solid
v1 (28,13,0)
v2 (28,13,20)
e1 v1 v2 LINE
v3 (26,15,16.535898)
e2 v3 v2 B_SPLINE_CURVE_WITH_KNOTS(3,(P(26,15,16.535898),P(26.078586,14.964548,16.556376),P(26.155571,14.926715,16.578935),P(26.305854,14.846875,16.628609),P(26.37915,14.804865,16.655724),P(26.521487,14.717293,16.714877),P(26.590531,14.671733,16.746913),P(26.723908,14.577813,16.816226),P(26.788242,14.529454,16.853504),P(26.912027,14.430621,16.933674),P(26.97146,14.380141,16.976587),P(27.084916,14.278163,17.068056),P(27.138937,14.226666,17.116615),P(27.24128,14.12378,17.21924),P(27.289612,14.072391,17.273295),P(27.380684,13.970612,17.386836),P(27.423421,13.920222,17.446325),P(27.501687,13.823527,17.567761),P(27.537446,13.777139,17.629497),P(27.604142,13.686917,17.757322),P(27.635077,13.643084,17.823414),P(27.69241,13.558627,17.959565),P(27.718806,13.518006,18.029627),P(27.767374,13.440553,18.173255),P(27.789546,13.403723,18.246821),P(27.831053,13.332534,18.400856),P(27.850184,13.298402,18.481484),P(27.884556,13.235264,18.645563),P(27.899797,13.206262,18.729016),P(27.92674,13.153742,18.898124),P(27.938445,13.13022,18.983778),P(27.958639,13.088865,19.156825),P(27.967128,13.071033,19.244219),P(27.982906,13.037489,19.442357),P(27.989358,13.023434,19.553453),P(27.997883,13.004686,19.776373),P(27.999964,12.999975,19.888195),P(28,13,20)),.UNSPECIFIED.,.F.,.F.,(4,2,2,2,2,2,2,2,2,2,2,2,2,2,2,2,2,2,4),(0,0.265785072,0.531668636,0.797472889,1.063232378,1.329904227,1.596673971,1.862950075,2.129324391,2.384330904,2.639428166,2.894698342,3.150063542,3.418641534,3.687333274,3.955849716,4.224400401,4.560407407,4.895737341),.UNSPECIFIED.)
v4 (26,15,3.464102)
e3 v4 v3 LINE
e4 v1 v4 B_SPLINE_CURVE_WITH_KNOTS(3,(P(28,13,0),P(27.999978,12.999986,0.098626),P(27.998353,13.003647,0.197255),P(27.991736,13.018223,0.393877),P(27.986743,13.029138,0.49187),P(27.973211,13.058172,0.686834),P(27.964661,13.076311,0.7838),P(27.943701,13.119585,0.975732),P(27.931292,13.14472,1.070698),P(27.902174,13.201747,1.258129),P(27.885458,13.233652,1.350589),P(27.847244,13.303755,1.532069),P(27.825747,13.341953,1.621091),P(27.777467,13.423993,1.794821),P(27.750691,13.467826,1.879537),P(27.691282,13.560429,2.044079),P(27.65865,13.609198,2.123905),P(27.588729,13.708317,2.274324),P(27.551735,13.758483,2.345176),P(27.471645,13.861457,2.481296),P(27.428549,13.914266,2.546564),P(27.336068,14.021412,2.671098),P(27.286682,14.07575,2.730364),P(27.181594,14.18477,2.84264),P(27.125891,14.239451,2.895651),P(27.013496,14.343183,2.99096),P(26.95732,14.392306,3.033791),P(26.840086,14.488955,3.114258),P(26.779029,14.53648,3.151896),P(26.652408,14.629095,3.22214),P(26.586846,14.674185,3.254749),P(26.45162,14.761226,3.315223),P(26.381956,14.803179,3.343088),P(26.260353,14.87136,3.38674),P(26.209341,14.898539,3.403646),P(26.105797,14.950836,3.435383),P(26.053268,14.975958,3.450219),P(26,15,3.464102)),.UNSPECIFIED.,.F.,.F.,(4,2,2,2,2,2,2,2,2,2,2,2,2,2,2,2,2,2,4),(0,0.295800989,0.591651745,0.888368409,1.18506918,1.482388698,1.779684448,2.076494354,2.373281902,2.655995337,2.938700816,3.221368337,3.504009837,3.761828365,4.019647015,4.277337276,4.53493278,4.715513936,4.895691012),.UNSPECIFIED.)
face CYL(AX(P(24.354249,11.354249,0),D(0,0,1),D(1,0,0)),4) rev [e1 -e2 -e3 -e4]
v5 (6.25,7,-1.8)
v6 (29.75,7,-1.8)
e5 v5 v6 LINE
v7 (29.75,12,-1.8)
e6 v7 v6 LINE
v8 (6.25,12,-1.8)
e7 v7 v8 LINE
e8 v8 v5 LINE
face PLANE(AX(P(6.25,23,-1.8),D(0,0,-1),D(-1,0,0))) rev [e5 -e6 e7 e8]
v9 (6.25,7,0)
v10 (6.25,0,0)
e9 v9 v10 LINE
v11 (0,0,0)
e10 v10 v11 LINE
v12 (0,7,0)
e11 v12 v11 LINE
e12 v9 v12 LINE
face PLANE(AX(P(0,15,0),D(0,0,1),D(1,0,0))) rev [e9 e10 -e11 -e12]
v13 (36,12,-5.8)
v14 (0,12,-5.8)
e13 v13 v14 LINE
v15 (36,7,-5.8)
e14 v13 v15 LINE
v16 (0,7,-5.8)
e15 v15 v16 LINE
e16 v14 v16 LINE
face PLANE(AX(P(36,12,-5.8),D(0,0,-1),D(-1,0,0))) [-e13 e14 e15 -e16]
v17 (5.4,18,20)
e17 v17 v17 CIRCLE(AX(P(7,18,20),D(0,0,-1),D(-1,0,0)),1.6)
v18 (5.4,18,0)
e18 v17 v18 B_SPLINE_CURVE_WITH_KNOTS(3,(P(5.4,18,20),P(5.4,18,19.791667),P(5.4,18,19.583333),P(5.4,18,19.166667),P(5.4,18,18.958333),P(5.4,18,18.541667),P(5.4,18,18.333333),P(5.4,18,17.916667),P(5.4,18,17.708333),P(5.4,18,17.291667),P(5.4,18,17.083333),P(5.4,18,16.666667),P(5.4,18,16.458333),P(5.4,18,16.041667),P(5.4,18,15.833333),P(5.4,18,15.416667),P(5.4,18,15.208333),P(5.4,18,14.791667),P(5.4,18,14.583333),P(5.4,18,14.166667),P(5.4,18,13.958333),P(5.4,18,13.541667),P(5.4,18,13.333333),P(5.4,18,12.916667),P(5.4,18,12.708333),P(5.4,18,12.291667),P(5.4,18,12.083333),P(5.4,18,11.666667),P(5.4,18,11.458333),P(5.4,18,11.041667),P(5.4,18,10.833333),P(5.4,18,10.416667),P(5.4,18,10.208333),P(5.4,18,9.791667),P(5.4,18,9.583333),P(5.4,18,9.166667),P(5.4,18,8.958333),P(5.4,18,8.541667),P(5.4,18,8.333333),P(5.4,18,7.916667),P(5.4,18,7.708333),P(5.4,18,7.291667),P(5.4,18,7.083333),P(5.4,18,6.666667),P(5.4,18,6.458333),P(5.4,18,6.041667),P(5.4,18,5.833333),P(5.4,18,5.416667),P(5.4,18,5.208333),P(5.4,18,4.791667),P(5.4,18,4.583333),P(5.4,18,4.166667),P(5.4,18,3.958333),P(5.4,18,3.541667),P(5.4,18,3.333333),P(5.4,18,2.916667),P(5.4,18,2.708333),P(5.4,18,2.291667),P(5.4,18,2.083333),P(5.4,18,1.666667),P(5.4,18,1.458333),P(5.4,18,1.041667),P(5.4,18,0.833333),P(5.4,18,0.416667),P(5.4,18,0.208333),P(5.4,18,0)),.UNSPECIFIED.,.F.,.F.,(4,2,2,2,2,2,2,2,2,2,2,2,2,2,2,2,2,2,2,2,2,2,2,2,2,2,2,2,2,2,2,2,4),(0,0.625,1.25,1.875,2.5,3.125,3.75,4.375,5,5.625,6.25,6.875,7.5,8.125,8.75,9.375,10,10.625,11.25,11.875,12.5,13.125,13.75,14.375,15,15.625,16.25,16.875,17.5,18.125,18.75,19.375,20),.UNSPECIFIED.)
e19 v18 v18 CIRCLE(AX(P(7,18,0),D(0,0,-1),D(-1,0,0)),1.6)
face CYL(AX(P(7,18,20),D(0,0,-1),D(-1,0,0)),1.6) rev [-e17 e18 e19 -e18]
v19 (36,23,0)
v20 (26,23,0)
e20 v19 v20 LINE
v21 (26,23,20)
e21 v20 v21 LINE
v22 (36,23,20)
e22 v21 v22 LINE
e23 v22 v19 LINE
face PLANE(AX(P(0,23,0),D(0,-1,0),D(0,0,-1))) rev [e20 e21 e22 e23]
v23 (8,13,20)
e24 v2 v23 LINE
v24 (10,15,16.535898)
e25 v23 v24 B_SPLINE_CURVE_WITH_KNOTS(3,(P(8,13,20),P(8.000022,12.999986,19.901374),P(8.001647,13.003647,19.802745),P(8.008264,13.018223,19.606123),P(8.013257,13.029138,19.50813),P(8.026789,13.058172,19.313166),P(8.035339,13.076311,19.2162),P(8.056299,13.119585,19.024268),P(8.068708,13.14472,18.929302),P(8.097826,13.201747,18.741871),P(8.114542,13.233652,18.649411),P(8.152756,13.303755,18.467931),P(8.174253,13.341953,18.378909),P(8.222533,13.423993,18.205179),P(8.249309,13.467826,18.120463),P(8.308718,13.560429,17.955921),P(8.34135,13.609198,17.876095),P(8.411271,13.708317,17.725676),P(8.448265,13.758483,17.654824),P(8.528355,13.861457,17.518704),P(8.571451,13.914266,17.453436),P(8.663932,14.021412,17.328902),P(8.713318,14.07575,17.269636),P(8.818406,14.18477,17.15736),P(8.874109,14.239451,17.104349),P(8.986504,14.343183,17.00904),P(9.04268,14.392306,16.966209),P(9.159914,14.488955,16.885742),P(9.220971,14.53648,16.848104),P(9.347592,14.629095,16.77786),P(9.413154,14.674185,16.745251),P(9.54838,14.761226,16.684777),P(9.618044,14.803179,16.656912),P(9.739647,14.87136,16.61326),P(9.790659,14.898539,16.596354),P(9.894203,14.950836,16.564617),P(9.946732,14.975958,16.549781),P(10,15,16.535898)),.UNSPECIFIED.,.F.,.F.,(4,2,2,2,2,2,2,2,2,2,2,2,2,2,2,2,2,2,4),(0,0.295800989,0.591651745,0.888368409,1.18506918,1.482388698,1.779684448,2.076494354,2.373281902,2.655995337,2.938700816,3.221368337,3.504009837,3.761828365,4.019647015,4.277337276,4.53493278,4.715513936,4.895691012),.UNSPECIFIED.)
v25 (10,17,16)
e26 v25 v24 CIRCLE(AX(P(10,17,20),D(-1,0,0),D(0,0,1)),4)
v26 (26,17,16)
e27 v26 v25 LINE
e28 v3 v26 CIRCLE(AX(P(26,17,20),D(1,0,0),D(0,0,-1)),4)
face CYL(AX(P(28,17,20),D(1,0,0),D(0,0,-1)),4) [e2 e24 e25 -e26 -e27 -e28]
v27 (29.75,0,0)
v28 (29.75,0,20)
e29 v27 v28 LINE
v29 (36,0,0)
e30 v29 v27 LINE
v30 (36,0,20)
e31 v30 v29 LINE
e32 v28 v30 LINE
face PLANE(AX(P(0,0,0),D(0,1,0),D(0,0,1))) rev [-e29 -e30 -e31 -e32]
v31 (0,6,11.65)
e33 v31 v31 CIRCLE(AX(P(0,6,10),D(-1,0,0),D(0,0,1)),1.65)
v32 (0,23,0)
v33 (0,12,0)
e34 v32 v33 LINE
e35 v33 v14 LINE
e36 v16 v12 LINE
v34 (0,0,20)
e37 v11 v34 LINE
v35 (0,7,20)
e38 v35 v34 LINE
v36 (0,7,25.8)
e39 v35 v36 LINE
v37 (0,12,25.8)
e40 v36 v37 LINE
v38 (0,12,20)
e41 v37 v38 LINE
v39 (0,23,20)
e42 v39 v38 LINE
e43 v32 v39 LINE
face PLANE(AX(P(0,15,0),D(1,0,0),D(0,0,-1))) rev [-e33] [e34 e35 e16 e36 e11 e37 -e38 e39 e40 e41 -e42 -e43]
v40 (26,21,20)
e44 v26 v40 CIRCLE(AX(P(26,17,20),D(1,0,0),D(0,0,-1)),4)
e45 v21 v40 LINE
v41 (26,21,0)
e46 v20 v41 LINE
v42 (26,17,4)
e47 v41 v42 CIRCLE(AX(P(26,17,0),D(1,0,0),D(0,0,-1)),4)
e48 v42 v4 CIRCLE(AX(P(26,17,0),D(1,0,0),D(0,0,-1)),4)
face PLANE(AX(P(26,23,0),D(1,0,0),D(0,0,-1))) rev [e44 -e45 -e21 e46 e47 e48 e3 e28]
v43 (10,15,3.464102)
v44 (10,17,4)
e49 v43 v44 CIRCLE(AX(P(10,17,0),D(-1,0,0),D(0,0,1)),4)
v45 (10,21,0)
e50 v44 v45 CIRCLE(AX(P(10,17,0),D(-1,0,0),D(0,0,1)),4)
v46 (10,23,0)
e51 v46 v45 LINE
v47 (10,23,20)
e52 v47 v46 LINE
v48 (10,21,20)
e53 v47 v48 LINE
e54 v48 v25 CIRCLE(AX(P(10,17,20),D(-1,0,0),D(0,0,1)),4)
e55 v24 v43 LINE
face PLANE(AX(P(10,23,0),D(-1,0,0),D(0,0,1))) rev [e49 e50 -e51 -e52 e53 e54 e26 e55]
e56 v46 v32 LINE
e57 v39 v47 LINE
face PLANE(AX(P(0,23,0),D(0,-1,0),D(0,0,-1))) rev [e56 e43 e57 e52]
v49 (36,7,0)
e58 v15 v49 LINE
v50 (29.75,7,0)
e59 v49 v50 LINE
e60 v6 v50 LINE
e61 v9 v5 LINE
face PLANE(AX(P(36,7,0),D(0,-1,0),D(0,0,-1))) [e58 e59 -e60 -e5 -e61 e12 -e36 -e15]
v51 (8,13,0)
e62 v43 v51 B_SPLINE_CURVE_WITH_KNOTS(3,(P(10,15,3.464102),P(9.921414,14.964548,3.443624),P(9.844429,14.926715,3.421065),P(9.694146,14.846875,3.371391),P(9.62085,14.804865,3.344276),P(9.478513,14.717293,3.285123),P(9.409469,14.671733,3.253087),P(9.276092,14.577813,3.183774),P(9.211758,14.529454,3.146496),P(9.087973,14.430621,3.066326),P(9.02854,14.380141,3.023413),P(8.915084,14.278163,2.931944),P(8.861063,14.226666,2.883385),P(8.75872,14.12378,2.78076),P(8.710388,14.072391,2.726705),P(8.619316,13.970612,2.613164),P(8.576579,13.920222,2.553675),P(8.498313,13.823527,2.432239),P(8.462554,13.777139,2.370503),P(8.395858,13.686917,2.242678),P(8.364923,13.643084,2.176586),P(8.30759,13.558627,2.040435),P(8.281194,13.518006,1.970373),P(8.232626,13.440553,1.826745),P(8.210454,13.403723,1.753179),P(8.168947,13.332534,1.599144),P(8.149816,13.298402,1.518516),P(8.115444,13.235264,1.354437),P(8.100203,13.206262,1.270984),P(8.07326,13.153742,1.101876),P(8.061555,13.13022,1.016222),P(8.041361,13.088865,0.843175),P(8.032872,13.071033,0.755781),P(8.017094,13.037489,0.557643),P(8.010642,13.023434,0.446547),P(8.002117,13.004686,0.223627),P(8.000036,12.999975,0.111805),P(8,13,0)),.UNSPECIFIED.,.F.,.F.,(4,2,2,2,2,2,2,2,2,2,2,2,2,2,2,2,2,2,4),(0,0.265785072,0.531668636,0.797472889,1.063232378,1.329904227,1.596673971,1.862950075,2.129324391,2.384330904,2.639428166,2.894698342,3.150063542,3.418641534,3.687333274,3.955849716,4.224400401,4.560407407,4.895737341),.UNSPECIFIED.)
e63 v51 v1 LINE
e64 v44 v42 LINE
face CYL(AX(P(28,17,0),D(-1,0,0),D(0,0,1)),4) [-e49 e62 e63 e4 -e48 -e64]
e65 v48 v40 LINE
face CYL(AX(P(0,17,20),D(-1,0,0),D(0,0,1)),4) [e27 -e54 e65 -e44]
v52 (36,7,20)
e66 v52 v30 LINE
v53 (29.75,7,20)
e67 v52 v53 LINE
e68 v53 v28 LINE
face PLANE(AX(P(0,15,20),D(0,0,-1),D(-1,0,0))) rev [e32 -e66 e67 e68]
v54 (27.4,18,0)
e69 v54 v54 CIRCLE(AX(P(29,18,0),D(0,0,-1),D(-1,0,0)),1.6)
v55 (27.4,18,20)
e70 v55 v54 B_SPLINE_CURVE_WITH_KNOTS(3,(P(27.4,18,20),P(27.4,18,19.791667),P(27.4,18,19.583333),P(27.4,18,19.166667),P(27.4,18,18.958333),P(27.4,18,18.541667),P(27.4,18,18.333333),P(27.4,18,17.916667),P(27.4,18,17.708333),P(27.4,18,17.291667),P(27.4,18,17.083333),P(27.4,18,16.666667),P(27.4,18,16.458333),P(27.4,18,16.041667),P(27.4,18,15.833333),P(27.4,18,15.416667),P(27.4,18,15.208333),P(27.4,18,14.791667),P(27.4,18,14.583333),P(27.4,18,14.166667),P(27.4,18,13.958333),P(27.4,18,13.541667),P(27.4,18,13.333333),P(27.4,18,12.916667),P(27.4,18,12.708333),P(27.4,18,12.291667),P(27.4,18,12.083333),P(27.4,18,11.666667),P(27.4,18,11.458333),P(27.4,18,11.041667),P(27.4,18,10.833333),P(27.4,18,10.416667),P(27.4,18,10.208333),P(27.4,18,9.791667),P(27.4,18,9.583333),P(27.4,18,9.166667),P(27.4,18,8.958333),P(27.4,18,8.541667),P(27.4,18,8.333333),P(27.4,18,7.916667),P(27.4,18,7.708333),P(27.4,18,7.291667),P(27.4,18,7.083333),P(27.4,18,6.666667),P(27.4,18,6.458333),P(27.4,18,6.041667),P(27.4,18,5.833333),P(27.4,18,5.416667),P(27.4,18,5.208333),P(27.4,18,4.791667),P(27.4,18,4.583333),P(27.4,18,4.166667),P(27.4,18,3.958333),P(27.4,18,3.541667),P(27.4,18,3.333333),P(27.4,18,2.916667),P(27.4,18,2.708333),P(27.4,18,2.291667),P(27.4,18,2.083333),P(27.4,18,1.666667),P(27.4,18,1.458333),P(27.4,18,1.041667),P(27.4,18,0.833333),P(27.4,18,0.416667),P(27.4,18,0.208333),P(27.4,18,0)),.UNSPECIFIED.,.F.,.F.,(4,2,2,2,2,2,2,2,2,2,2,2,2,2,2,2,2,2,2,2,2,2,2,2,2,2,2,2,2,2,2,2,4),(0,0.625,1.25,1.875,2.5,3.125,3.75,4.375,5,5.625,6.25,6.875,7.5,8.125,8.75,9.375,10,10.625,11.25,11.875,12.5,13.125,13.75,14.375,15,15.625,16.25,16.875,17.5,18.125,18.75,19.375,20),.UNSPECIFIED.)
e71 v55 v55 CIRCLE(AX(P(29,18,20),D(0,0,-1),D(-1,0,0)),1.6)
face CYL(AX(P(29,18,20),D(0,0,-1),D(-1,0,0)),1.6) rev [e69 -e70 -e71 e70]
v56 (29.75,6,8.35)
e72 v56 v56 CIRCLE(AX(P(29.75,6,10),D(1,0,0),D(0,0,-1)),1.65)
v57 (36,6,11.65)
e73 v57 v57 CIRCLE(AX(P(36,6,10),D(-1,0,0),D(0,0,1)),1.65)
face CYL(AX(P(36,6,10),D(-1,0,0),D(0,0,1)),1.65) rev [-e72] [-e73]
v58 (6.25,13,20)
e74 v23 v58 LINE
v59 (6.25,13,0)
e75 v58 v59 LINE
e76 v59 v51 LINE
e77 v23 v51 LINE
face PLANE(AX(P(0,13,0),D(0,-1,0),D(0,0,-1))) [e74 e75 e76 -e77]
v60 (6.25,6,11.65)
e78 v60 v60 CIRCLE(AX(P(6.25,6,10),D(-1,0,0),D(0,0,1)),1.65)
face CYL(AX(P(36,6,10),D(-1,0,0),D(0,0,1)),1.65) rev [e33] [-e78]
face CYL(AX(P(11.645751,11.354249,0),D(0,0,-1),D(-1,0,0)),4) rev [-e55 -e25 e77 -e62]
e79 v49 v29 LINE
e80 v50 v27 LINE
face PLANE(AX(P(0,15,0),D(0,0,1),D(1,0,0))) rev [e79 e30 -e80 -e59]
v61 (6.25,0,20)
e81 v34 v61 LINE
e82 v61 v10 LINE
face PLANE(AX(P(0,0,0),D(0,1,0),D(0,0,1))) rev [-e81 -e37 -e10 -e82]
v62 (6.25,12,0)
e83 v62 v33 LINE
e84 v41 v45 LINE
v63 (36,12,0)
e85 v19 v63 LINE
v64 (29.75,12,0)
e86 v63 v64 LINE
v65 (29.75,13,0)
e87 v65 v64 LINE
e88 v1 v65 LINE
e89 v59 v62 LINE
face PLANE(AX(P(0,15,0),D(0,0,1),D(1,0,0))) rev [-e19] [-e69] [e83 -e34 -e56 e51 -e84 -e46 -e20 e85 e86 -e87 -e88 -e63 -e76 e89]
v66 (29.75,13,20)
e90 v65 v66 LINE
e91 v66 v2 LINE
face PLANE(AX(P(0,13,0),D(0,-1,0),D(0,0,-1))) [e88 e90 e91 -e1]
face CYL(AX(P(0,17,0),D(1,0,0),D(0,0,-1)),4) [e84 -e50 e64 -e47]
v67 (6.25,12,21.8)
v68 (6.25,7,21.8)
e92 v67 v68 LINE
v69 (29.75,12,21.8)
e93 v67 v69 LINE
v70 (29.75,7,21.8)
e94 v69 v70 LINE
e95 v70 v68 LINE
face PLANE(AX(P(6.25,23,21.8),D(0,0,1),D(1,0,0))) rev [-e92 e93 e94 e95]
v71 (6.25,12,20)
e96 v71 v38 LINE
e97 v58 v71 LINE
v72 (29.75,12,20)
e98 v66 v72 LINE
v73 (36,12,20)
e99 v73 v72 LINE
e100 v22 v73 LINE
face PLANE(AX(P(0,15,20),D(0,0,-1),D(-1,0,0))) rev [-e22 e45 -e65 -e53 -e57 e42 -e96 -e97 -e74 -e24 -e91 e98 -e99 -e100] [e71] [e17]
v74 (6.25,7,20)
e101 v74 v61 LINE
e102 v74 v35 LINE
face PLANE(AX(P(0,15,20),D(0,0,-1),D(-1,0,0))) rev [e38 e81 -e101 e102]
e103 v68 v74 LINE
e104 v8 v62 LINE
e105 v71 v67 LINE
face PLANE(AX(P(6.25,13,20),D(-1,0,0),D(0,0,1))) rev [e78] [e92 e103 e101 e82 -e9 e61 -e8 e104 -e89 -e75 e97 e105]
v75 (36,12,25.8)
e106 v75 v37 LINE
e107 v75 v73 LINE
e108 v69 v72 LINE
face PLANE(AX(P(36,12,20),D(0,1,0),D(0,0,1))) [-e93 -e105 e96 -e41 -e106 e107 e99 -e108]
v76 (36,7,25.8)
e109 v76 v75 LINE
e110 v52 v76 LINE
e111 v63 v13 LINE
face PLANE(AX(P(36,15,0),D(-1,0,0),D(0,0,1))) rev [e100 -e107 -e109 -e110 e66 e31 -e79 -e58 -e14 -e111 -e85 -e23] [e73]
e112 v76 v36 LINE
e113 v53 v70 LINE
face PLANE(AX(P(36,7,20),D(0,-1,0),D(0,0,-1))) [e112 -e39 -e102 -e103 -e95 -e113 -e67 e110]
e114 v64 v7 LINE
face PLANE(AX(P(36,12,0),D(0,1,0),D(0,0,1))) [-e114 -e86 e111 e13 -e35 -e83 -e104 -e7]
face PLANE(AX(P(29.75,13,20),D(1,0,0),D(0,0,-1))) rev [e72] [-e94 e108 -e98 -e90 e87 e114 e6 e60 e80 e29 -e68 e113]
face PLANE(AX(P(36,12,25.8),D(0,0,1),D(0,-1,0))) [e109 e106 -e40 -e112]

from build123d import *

# Parameters (mm, degrees)
SKETCH1_W           = 36
SKETCH1_H           = 20
BOSS_EXTRUDE1_DEPTH = 15
SKETCH2_W           = 23.5
SKETCH2_H           = 20
CUT_EXTRUDE1_DEPTH  = 13
SKETCH3_R           = 1.65
CUT_EXTRUDE2_DEPTH  = 44.829214002
SKETCH4_W           = 20
SKETCH4_H           = 12
CUT_EXTRUDE3_DEPTH  = 44.829214002
SKETCH5_W           = 10
SKETCH5_H           = 20
BOSS_EXTRUDE2_DEPTH = 8
SKETCH6_R           = 1.6
CUT_EXTRUDE4_DEPTH  = 48.16990566
SKETCH7_W           = 16
SKETCH7_H           = 4
BOSS_EXTRUDE3_DEPTH = 6
FILLET1_R           = 4
FILLET2_R           = 4
FILLET5_R           = 4
SKETCH8_W           = 5.8
SKETCH8_H           = 5
BOSS_EXTRUDE4_DEPTH = 36
SKETCH9_W           = 23.5
SKETCH9_H           = 1.8
CUT_EXTRUDE5_DEPTH  = 48.091825193


# Some blends are built 0.0001 mm under size
with BuildPart() as part:
    # Sketch1 → Boss-Extrude1 (new body)
    with BuildSketch(Plane(origin=(0, 0, 0), x_dir=(1, 0, 0), z_dir=(0, 1, 0))):
        with Locations((18, -10)):
            Rectangle(SKETCH1_W, SKETCH1_H)
    extrude(amount=BOSS_EXTRUDE1_DEPTH)

    # Sketch2 → Cut-Extrude1 (cut)
    with BuildSketch(Plane(origin=(0, 0, 0), x_dir=(-1, 0, 0), z_dir=(0, -1, 0))):
        with Locations((-18, -10)):
            Rectangle(SKETCH2_W, SKETCH2_H)
    extrude(amount=-CUT_EXTRUDE1_DEPTH, mode=Mode.SUBTRACT)

    # Sketch3 → Cut-Extrude2 (cut, through all)
    with BuildSketch(Plane.ZY):
        with Locations((10, 6)):
            Circle(SKETCH3_R)
    extrude(amount=-CUT_EXTRUDE2_DEPTH, mode=Mode.SUBTRACT)

    # Sketch4 → Cut-Extrude3 (cut, through all)
    with BuildSketch(Plane(origin=(0, 15, 0), x_dir=(1, 0, 0), z_dir=(0, 1, 0))):
        with Locations((18, -10)):
            Rectangle(SKETCH4_W, SKETCH4_H)
    extrude(amount=-CUT_EXTRUDE3_DEPTH, mode=Mode.SUBTRACT)

    # Sketch5 → Boss-Extrude2 (add)
    with BuildSketch(Plane(origin=(0, 15, 0), x_dir=(1, 0, 0), z_dir=(0, 1, 0))):
        with Locations((31, -10)):
            Rectangle(SKETCH5_W, SKETCH5_H)
        with Locations((5, -10)):
            Rectangle(SKETCH5_W, SKETCH5_H)
    extrude(amount=BOSS_EXTRUDE2_DEPTH)

    # Sketch6 → Cut-Extrude4 (cut, through all)
    with BuildSketch(Plane(origin=(0, 0, 0), x_dir=(-1, 0, 0), z_dir=(0, 0, -1))):
        with Locations((-29, 18)):
            Circle(SKETCH6_R)
        with Locations((-7, 18)):
            Circle(SKETCH6_R)
    extrude(amount=-CUT_EXTRUDE4_DEPTH, mode=Mode.SUBTRACT)

    # Sketch7 → Boss-Extrude3 (add)
    with BuildSketch(Plane(origin=(0, 15, 0), x_dir=(1, 0, 0), z_dir=(0, 1, 0))):
        with Locations((18, -18)):
            Rectangle(SKETCH7_W, SKETCH7_H)
        with Locations((18, -2)):
            Rectangle(SKETCH7_W, SKETCH7_H)
    extrude(amount=BOSS_EXTRUDE3_DEPTH)

    # Fillet1
    # the kernel refuses this fillet: 4 mm, written as the material it takes off along each edge
    with BuildSketch(Plane(origin=(8, 13, 16), x_dir=(0, 0, 1), z_dir=(1, 0, 0))) as fillet1_piece_1_section:
        with BuildLine():
            CenterArc((FILLET1_R, -FILLET1_R), FILLET1_R, 90, 90)
            Line((0, -FILLET1_R), (0, 0))
            Line((0, 0), (FILLET1_R, 0))
        make_face()
    fillet1_piece_1 = extrude(amount=20, mode=Mode.PRIVATE)
    fillet1_piece_1 = split(fillet1_piece_1, bisect_by=Plane(origin=(10, 13, 16), z_dir=(-1, 0, 0)), keep=Keep.TOP, mode=Mode.PRIVATE)
    fillet1_piece_1 = split(fillet1_piece_1, bisect_by=Plane(origin=(8, 15, 16), z_dir=(0, -1, 0)), keep=Keep.TOP, mode=Mode.PRIVATE)
    add(fillet1_piece_1, mode=Mode.SUBTRACT)
    with BuildSketch(Plane(origin=(8, 13, 16), x_dir=(0, 0, 1), z_dir=(1, 0, 0))) as fillet1_piece_2_section:
        with BuildLine():
            CenterArc((FILLET1_R, -FILLET1_R), FILLET1_R, 90, 90)
            Line((0, -FILLET1_R), (0, 0))
            Line((0, 0), (FILLET1_R, 0))
        make_face()
    fillet1_piece_2 = extrude(amount=20, mode=Mode.PRIVATE)
    fillet1_piece_2 = split(fillet1_piece_2, bisect_by=Plane(origin=(10, 13, 16), z_dir=(1, 0, 0)), keep=Keep.TOP, mode=Mode.PRIVATE)
    fillet1_piece_2 = split(fillet1_piece_2, bisect_by=Plane(origin=(26, 13, 16), z_dir=(-1, 0, 0)), keep=Keep.TOP, mode=Mode.PRIVATE)
    fillet1_piece_2 = split(fillet1_piece_2, bisect_by=Plane(origin=(8, 15, 16), z_dir=(0, -1, 0)), keep=Keep.TOP, mode=Mode.PRIVATE)
    add(fillet1_piece_2, mode=Mode.SUBTRACT)
    with BuildSketch(Plane(origin=(8, 13, 16), x_dir=(0, 0, 1), z_dir=(1, 0, 0))) as fillet1_piece_3_section:
        with BuildLine():
            CenterArc((FILLET1_R, -FILLET1_R), FILLET1_R, 90, 90)
            Line((0, -FILLET1_R), (0, 0))
            Line((0, 0), (FILLET1_R, 0))
        make_face()
    fillet1_piece_3 = extrude(amount=20, mode=Mode.PRIVATE)
    fillet1_piece_3 = split(fillet1_piece_3, bisect_by=Plane(origin=(10, 13, 16), z_dir=(1, 0, 0)), keep=Keep.TOP, mode=Mode.PRIVATE)
    fillet1_piece_3 = split(fillet1_piece_3, bisect_by=Plane(origin=(26, 13, 16), z_dir=(-1, 0, 0)), keep=Keep.TOP, mode=Mode.PRIVATE)
    fillet1_piece_3 = split(fillet1_piece_3, bisect_by=Plane(origin=(8, 15, 16), z_dir=(0, 1, 0)), keep=Keep.TOP, mode=Mode.PRIVATE)
    add(fillet1_piece_3, mode=Mode.SUBTRACT)
    with BuildSketch(Plane(origin=(8, 13, 16), x_dir=(0, 0, 1), z_dir=(1, 0, 0))) as fillet1_piece_4_section:
        with BuildLine():
            CenterArc((FILLET1_R, -FILLET1_R), FILLET1_R, 90, 90)
            Line((0, -FILLET1_R), (0, 0))
            Line((0, 0), (FILLET1_R, 0))
        make_face()
    fillet1_piece_4 = extrude(amount=20, mode=Mode.PRIVATE)
    fillet1_piece_4 = split(fillet1_piece_4, bisect_by=Plane(origin=(26, 13, 16), z_dir=(1, 0, 0)), keep=Keep.TOP, mode=Mode.PRIVATE)
    fillet1_piece_4 = split(fillet1_piece_4, bisect_by=Plane(origin=(8, 15, 16), z_dir=(0, -1, 0)), keep=Keep.TOP, mode=Mode.PRIVATE)
    add(fillet1_piece_4, mode=Mode.SUBTRACT)
    with BuildSketch(Plane(origin=(28, 13, 4), x_dir=(0, 0, -1), z_dir=(-1, 0, 0))) as fillet1_piece_5_section:
        with BuildLine():
            CenterArc((FILLET1_R, -FILLET1_R), FILLET1_R, 90, 90)
            Line((0, -FILLET1_R), (0, 0))
            Line((0, 0), (FILLET1_R, 0))
        make_face()
    fillet1_piece_5 = extrude(amount=20, mode=Mode.PRIVATE)
    fillet1_piece_5 = split(fillet1_piece_5, bisect_by=Plane(origin=(26, 13, 4), z_dir=(1, 0, 0)), keep=Keep.TOP, mode=Mode.PRIVATE)
    fillet1_piece_5 = split(fillet1_piece_5, bisect_by=Plane(origin=(28, 15, 4), z_dir=(0, -1, 0)), keep=Keep.TOP, mode=Mode.PRIVATE)
    add(fillet1_piece_5, mode=Mode.SUBTRACT)
    with BuildSketch(Plane(origin=(28, 13, 4), x_dir=(0, 0, -1), z_dir=(-1, 0, 0))) as fillet1_piece_6_section:
        with BuildLine():
            CenterArc((FILLET1_R, -FILLET1_R), FILLET1_R, 90, 90)
            Line((0, -FILLET1_R), (0, 0))
            Line((0, 0), (FILLET1_R, 0))
        make_face()
    fillet1_piece_6 = extrude(amount=20, mode=Mode.PRIVATE)
    fillet1_piece_6 = split(fillet1_piece_6, bisect_by=Plane(origin=(10, 13, 4), z_dir=(1, 0, 0)), keep=Keep.TOP, mode=Mode.PRIVATE)
    fillet1_piece_6 = split(fillet1_piece_6, bisect_by=Plane(origin=(26, 13, 4), z_dir=(-1, 0, 0)), keep=Keep.TOP, mode=Mode.PRIVATE)
    fillet1_piece_6 = split(fillet1_piece_6, bisect_by=Plane(origin=(28, 15, 4), z_dir=(0, -1, 0)), keep=Keep.TOP, mode=Mode.PRIVATE)
    add(fillet1_piece_6, mode=Mode.SUBTRACT)
    with BuildSketch(Plane(origin=(28, 13, 4), x_dir=(0, 0, -1), z_dir=(-1, 0, 0))) as fillet1_piece_7_section:
        with BuildLine():
            CenterArc((FILLET1_R, -FILLET1_R), FILLET1_R, 90, 90)
            Line((0, -FILLET1_R), (0, 0))
            Line((0, 0), (FILLET1_R, 0))
        make_face()
    fillet1_piece_7 = extrude(amount=20, mode=Mode.PRIVATE)
    fillet1_piece_7 = split(fillet1_piece_7, bisect_by=Plane(origin=(10, 13, 4), z_dir=(1, 0, 0)), keep=Keep.TOP, mode=Mode.PRIVATE)
    fillet1_piece_7 = split(fillet1_piece_7, bisect_by=Plane(origin=(26, 13, 4), z_dir=(-1, 0, 0)), keep=Keep.TOP, mode=Mode.PRIVATE)
    fillet1_piece_7 = split(fillet1_piece_7, bisect_by=Plane(origin=(28, 15, 4), z_dir=(0, 1, 0)), keep=Keep.TOP, mode=Mode.PRIVATE)
    add(fillet1_piece_7, mode=Mode.SUBTRACT)
    with BuildSketch(Plane(origin=(28, 13, 4), x_dir=(0, 0, -1), z_dir=(-1, 0, 0))) as fillet1_piece_8_section:
        with BuildLine():
            CenterArc((FILLET1_R, -FILLET1_R), FILLET1_R, 90, 90)
            Line((0, -FILLET1_R), (0, 0))
            Line((0, 0), (FILLET1_R, 0))
        make_face()
    fillet1_piece_8 = extrude(amount=20, mode=Mode.PRIVATE)
    fillet1_piece_8 = split(fillet1_piece_8, bisect_by=Plane(origin=(10, 13, 4), z_dir=(-1, 0, 0)), keep=Keep.TOP, mode=Mode.PRIVATE)
    fillet1_piece_8 = split(fillet1_piece_8, bisect_by=Plane(origin=(28, 15, 4), z_dir=(0, -1, 0)), keep=Keep.TOP, mode=Mode.PRIVATE)
    add(fillet1_piece_8, mode=Mode.SUBTRACT)

    # Fillet2
    # the kernel refuses this fillet: 4 mm, written as the material it adds along each edge
    with BuildSketch(Plane(origin=(8, 15, 21.535898385), x_dir=(1, 0, 0), z_dir=(0, 0, -1))) as fillet2_piece_1_section:
        with BuildLine():
            CenterArc((3.645751311, 3.645751311), FILLET2_R, 204.295188945, 41.409622109)
            Line((0, 2), (0, 0))
            Line((0, 0), (2, 0))
        make_face()
    fillet2_piece_1 = extrude(amount=23.07179677, mode=Mode.PRIVATE)
    fillet2_piece_1 = split(fillet2_piece_1, bisect_by=Plane(origin=(8, 15, 0), z_dir=(0, 0, 1)), keep=Keep.TOP, mode=Mode.PRIVATE)
    fillet2_piece_1 = split(fillet2_piece_1, bisect_by=Plane(origin=(8, 15, 20), z_dir=(0, 0, -1)), keep=Keep.TOP, mode=Mode.PRIVATE)
    add(fillet2_piece_1)
    with BuildSketch(Plane(origin=(28, 15, -1.535898385), x_dir=(-1, 0, 0), z_dir=(0, 0, 1))) as fillet2_piece_2_section:
        with BuildLine():
            CenterArc((3.645751311, 3.645751311), FILLET2_R, 204.295188945, 41.409622109)
            Line((0, 2), (0, 0))
            Line((0, 0), (2, 0))
        make_face()
    fillet2_piece_2 = extrude(amount=23.07179677, mode=Mode.PRIVATE)
    fillet2_piece_2 = split(fillet2_piece_2, bisect_by=Plane(origin=(28, 15, 0), z_dir=(0, 0, 1)), keep=Keep.TOP, mode=Mode.PRIVATE)
    fillet2_piece_2 = split(fillet2_piece_2, bisect_by=Plane(origin=(28, 15, 20), z_dir=(0, 0, -1)), keep=Keep.TOP, mode=Mode.PRIVATE)
    add(fillet2_piece_2)

    # Fillet5
    fillet5_edges = [part.edges().sort_by_distance(p)[0] for p in [
        (18, 21, 16),
        (18, 21, 4),
    ]]
    fillet(fillet5_edges, radius=FILLET5_R - 0.0001)  # a hair under: the kernel refuses the full size

    # Sketch8 → Boss-Extrude4 (add)
    with BuildSketch(Plane.ZY):
        with Locations((22.9, 9.5)):
            Rectangle(SKETCH8_W, SKETCH8_H)
        with Locations((-2.9, 9.5)):
            Rectangle(SKETCH8_W, SKETCH8_H)
    extrude(amount=-BOSS_EXTRUDE4_DEPTH)

    # Sketch9 → Cut-Extrude5 (cut, through all)
    with BuildSketch(Plane(origin=(0, 7, 0), x_dir=(-1, 0, 0), z_dir=(0, -1, 0))):
        with Locations((-18, 0.9)):
            Rectangle(SKETCH9_W, SKETCH9_H)
        with Locations((-18, -20.9)):
            Rectangle(SKETCH9_W, SKETCH9_H)
    extrude(amount=-CUT_EXTRUDE5_DEPTH, mode=Mode.SUBTRACT)


solid = part.part
